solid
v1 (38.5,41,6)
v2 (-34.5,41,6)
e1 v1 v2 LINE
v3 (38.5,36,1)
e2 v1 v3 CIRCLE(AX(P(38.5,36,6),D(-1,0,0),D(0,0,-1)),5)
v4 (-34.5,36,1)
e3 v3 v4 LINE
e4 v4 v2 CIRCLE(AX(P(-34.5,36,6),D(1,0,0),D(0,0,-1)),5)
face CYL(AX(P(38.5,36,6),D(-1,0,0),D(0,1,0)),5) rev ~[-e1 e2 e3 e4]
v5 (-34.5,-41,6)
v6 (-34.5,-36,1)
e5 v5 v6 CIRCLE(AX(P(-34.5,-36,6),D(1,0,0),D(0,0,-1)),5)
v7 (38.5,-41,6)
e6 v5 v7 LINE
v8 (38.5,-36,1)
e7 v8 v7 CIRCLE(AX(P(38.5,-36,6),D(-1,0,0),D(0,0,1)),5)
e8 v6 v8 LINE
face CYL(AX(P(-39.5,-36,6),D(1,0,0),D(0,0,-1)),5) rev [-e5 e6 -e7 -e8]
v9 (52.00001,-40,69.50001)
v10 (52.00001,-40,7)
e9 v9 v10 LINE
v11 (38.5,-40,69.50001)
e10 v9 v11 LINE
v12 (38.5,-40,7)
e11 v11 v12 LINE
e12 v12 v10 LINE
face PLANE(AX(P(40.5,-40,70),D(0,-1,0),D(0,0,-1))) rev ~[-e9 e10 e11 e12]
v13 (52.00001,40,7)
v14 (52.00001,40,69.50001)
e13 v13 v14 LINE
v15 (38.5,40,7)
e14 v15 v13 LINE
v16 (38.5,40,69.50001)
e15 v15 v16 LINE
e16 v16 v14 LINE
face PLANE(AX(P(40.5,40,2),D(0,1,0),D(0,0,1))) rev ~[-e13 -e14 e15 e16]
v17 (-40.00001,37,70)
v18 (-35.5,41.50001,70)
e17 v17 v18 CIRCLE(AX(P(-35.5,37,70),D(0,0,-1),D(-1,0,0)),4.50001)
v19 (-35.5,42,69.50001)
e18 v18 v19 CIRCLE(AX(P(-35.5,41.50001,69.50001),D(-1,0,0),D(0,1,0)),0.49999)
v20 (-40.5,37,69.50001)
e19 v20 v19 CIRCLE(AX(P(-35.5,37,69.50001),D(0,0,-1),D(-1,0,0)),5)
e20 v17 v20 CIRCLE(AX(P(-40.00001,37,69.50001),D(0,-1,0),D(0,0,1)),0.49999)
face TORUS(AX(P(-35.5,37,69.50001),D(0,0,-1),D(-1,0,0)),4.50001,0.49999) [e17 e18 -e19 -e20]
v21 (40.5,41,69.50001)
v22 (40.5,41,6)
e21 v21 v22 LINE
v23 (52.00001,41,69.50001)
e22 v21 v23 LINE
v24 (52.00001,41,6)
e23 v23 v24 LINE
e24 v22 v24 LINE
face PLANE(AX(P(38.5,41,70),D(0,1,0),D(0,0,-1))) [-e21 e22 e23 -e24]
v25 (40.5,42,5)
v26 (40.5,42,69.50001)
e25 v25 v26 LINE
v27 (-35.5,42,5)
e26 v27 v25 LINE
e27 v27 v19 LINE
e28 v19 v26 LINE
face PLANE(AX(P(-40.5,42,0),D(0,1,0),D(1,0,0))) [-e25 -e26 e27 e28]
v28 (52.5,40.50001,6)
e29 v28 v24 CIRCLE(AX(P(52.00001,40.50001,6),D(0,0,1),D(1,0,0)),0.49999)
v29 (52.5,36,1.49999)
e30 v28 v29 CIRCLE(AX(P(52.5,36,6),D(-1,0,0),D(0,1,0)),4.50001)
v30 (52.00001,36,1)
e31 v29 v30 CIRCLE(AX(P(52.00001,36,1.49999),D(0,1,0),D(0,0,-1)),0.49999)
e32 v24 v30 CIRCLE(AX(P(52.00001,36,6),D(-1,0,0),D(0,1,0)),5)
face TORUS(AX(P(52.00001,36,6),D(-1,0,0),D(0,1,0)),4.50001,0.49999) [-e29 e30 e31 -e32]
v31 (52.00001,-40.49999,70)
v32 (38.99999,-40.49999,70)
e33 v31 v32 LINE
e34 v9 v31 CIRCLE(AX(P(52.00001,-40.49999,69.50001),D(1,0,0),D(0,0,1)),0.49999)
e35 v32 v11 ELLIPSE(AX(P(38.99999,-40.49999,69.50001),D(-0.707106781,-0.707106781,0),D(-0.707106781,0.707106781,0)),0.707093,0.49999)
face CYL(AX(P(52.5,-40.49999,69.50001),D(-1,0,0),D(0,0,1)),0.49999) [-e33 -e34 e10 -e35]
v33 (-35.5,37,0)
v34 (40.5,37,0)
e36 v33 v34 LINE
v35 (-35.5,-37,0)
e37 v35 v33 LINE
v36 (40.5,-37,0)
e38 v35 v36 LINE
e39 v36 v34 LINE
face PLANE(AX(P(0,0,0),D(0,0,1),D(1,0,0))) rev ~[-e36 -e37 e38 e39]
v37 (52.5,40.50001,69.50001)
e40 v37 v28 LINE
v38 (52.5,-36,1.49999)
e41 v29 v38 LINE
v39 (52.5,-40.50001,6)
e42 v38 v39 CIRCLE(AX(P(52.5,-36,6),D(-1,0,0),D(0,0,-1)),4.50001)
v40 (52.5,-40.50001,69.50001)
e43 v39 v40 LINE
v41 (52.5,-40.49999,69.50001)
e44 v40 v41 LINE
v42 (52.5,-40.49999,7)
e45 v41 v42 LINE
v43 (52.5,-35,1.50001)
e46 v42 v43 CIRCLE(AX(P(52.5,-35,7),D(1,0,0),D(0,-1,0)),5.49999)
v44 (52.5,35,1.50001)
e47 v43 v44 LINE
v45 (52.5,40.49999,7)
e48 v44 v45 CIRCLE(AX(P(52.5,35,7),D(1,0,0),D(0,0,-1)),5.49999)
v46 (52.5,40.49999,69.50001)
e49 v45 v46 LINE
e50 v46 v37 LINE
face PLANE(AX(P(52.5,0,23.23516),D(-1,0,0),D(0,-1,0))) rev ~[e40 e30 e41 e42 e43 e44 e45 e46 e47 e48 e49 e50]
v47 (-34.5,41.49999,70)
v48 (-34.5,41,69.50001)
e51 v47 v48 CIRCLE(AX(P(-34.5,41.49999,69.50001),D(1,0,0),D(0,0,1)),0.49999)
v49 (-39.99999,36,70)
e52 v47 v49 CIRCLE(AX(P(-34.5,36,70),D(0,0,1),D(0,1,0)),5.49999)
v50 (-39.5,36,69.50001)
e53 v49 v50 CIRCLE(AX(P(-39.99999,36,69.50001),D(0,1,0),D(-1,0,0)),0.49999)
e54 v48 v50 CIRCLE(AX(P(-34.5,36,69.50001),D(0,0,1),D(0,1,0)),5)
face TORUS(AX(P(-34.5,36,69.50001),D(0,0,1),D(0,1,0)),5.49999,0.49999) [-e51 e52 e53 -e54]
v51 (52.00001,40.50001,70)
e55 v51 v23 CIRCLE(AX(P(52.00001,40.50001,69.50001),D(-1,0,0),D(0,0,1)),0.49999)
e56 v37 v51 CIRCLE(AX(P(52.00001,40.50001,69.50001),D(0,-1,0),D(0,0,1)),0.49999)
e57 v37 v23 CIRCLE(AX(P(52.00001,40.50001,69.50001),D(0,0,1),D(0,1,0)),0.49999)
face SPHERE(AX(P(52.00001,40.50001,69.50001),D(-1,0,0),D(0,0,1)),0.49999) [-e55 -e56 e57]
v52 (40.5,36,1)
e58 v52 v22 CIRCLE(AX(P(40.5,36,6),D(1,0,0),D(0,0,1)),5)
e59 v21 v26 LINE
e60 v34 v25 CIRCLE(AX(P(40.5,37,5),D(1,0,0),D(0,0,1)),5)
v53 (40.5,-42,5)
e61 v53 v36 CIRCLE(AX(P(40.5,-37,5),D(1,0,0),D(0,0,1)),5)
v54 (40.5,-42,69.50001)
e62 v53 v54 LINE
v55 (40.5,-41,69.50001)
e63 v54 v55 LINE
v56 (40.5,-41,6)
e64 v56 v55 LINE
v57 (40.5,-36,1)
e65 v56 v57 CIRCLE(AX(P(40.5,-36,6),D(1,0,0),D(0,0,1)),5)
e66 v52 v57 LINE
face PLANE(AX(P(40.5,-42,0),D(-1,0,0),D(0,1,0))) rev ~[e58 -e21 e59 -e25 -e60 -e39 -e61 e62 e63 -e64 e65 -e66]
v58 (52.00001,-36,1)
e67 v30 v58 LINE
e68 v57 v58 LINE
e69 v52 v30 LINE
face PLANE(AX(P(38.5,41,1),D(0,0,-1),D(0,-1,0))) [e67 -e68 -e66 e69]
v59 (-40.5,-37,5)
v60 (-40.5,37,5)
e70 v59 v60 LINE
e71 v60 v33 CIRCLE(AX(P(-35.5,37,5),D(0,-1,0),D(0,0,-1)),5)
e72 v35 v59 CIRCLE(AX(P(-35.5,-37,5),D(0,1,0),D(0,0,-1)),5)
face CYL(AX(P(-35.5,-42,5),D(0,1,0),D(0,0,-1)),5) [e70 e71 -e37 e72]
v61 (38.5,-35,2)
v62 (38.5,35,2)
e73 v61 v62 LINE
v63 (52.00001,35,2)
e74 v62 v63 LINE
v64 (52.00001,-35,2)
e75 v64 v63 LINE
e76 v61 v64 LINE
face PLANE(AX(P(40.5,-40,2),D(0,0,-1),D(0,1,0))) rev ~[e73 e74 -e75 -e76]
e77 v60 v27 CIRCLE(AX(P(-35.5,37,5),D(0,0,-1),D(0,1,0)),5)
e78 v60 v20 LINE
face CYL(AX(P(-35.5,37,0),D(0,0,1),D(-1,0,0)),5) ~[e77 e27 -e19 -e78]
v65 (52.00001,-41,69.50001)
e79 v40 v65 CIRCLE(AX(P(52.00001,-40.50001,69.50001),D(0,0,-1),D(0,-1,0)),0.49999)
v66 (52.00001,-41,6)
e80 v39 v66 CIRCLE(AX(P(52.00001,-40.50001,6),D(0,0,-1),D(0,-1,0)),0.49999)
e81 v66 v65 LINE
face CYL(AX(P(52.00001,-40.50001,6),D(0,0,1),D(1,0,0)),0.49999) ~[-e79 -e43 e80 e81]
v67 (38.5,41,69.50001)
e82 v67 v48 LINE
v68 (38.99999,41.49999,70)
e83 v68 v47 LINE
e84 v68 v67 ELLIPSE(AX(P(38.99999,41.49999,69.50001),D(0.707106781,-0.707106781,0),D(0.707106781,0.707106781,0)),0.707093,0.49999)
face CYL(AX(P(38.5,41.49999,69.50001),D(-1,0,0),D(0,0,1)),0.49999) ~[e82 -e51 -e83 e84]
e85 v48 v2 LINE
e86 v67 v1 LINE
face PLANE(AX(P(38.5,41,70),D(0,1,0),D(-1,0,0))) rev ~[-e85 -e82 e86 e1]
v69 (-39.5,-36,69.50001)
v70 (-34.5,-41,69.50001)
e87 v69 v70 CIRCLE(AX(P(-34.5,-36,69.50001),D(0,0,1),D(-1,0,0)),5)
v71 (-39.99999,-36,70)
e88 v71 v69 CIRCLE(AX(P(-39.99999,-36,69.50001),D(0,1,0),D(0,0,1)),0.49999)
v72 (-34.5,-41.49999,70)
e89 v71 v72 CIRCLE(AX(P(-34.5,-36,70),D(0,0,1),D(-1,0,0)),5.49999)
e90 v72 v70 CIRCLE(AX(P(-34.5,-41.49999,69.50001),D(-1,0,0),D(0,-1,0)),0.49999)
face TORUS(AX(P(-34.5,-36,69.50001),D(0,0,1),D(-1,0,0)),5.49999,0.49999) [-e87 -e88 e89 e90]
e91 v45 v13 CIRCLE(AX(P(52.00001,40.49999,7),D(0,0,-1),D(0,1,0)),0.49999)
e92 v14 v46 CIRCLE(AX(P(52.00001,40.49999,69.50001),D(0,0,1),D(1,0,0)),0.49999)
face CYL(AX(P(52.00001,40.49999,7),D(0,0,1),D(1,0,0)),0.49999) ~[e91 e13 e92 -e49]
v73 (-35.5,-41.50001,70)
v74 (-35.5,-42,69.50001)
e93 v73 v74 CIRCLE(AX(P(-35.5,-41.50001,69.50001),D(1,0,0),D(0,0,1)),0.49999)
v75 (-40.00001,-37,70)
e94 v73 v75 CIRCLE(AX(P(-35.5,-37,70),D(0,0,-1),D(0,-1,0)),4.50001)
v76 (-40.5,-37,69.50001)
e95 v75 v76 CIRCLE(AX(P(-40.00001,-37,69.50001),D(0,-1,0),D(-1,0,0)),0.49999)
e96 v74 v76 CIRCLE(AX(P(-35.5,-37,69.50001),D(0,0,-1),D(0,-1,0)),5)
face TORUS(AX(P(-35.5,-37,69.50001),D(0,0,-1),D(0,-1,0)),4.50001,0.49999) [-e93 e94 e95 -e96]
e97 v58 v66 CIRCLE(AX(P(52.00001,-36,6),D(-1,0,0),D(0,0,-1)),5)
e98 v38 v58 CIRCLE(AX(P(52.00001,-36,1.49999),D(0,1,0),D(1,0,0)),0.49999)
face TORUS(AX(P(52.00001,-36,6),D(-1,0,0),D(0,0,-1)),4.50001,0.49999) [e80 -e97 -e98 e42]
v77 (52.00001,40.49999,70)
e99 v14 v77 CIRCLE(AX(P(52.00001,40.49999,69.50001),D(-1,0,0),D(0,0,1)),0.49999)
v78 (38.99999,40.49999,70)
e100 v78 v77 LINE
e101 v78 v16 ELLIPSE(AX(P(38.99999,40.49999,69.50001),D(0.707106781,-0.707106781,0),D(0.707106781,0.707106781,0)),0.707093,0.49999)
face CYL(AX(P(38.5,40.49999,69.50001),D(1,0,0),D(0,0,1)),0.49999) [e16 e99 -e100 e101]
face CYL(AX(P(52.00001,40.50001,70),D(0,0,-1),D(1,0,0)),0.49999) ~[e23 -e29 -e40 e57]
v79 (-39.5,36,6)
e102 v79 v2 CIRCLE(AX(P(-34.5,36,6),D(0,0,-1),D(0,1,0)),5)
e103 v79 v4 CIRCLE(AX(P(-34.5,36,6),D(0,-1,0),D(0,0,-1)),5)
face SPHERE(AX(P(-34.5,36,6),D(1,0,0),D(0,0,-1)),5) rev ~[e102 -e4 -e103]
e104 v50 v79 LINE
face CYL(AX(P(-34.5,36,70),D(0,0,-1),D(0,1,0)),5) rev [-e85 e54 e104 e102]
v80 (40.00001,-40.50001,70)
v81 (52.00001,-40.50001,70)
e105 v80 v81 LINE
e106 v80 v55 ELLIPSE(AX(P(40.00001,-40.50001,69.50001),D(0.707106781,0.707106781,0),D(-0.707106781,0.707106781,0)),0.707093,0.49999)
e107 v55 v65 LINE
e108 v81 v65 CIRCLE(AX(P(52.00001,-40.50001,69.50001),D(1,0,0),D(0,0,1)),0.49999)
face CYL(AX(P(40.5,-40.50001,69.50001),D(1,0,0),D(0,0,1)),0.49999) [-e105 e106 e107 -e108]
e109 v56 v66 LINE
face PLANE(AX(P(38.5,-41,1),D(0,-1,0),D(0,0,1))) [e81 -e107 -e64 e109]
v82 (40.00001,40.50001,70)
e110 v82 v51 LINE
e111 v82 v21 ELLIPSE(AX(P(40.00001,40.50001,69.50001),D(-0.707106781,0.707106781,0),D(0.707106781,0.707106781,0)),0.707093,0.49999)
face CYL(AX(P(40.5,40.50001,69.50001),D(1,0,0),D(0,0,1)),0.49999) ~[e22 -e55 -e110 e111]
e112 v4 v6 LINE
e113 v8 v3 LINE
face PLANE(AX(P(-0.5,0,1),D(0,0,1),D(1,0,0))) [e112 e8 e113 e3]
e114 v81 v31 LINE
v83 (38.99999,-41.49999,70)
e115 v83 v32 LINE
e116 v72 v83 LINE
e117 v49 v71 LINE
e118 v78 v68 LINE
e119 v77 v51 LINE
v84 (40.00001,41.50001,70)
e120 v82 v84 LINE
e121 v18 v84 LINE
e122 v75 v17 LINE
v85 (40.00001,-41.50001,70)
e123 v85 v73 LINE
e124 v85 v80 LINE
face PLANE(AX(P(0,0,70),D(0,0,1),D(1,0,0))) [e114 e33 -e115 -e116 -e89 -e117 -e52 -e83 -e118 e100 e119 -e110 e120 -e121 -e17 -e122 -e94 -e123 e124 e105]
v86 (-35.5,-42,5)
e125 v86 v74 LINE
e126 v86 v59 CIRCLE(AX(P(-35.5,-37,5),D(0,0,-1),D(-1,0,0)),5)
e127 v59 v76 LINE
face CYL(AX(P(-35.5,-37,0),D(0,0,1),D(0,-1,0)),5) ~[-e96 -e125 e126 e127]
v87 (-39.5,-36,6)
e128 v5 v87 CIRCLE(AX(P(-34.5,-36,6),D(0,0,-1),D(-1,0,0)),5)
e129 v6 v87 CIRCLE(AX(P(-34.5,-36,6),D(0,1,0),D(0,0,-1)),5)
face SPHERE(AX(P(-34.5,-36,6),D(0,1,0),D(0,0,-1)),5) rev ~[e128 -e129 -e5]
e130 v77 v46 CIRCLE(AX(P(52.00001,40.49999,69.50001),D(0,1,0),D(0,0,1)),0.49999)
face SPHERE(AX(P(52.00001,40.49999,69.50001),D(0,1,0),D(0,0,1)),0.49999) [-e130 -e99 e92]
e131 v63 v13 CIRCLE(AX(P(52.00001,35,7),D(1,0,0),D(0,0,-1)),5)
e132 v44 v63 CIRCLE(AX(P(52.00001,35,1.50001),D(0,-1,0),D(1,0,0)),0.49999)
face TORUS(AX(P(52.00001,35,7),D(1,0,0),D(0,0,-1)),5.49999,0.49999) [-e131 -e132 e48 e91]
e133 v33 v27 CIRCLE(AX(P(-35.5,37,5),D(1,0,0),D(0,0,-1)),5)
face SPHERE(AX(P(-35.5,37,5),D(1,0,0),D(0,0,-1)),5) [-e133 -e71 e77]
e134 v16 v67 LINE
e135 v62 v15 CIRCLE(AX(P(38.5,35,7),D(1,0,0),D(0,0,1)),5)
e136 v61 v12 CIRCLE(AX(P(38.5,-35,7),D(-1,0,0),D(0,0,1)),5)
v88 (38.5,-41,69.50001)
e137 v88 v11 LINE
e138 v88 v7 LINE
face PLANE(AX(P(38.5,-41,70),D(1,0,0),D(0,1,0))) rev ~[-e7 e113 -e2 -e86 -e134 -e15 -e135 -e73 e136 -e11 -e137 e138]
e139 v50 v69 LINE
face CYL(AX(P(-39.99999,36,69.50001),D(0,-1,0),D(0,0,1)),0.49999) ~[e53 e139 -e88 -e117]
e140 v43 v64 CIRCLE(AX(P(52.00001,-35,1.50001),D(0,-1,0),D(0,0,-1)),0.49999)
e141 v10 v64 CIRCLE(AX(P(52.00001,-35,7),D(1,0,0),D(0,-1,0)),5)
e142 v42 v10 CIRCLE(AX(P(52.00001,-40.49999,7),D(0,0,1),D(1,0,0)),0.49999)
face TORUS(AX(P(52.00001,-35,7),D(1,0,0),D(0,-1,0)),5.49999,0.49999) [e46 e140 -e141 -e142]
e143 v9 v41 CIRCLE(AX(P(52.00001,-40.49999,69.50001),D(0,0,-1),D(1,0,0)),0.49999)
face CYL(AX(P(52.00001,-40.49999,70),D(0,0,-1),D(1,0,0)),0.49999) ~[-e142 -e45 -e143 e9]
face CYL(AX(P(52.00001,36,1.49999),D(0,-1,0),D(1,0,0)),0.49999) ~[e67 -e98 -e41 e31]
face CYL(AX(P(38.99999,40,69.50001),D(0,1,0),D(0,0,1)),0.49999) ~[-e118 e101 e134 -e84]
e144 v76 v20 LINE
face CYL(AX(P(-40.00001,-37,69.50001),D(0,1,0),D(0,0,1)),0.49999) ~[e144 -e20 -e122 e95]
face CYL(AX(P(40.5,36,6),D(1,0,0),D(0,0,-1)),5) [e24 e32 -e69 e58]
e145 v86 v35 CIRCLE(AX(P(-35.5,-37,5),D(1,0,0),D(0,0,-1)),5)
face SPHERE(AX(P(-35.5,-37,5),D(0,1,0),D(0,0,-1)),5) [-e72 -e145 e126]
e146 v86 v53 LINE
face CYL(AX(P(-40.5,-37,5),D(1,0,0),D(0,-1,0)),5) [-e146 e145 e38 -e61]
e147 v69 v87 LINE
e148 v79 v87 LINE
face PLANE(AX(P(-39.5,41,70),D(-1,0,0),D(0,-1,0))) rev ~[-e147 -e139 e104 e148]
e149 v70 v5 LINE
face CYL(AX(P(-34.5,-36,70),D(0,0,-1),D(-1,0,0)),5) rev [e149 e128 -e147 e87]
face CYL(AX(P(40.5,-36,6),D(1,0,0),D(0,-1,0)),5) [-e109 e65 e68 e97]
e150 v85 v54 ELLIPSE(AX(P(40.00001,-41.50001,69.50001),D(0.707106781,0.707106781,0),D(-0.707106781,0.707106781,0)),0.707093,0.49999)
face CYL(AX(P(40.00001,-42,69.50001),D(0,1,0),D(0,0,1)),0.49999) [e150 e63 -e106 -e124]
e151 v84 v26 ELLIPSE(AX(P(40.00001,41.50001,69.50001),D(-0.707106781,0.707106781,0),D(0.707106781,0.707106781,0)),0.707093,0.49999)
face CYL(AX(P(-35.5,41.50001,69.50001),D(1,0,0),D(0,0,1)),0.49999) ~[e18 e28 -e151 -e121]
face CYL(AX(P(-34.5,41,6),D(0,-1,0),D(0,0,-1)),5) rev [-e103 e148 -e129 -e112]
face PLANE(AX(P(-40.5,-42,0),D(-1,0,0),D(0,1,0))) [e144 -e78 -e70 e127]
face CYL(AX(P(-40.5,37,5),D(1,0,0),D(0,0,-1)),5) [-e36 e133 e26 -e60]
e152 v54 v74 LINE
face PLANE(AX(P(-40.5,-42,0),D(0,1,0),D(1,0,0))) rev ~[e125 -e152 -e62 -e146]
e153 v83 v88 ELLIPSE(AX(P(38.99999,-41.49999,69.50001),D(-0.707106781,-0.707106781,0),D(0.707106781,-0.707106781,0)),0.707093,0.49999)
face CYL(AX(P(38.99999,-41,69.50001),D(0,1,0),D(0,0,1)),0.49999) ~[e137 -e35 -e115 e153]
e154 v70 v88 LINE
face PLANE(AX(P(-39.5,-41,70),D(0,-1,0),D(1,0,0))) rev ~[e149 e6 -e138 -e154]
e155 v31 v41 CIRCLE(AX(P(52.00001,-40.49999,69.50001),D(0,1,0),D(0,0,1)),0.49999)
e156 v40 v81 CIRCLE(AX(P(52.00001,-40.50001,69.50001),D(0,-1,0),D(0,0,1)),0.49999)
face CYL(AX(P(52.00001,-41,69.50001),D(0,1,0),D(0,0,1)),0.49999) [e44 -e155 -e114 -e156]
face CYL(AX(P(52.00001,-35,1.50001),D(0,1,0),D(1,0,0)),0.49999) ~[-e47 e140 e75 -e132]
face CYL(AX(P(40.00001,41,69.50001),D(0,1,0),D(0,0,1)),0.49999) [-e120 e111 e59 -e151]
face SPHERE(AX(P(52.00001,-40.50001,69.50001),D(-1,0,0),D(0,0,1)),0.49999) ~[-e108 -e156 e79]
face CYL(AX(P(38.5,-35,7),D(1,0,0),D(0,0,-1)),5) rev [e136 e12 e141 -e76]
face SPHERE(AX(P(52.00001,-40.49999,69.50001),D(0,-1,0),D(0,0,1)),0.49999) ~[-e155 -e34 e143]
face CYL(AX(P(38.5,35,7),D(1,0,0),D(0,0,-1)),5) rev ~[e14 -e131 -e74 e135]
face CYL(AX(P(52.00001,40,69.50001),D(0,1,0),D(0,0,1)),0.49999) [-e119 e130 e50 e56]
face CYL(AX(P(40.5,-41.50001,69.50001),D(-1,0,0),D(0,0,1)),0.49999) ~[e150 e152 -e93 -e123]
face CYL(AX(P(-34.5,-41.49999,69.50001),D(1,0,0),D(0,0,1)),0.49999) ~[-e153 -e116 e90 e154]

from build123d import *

# Parameters (mm, degrees)
F0_W     = 81
F0_H     = 84
F1_DEPTH = 70
F3_DEPTH = 69
F5_DEPTH = 2
F7_DEPTH = 14
F8_R     = 5
F9_R     = 0.49999


# Not quite as in the source:
# - a fillet or chamfer is up to 0.001 mm smaller than in the source, because OpenCascade refuses the exact size


with BuildPart() as f1:
    # F0 (on Top) → F1 (new body)
    with BuildSketch(Plane.XY):
        Rectangle(F0_W, F0_H)
    extrude(amount=F1_DEPTH)

    # F2 (on face) → F3 (cut)
    with BuildSketch(Plane.XY.offset(70)):
        Polygon((38.5, 41), (-39.5, 41), (-39.5, 20.586034283), (-39.5, -41), (38.5, -41), (38.5, -37.5405208561), align=None)
    extrude(amount=-F3_DEPTH, mode=Mode.SUBTRACT)

    # F4 (on face) → F5 (cut)
    with BuildSketch(Plane.YZ.offset(40.5)):
        Polygon((40, 2), (40, 70), (-40, 70), (-40, 42.2970801592), (-40, 2), align=None)
    extrude(amount=-F5_DEPTH, mode=Mode.SUBTRACT)

    # F6 (on face) → F7 (join)
    with BuildSketch(Plane(origin=(38.5, 0, 0), x_dir=(0, -1, 0), z_dir=(-1, 0, 0))):
        Polygon((41, 1), (41, 70), (40, 70), (40, 2), (-40, 2), (-40, 70), (-41, 70), (-41, 1), align=None)
    extrude(amount=-F7_DEPTH)

    # F8
    f8_edges = [f1.edges().sort_by_distance(p)[0] for p in [
        (-0.5, 41, 1),
        (-39.5, 0, 1),
        (-0.5, -41, 1),
        (0, 42, 0),
        (-40.5, 0, 0),
        (0, -42, 0),
        (-40.5, -42, 35),
        (-40.5, 42, 35),
        (-39.5, 41, 35.5),
        (-39.5, -41, 35.5),
        (46.5, 41, 1),
        (46.5, -41, 1),
        (45.5, -40, 2),
        (45.5, 40, 2),
    ]]
    fillet(f8_edges, radius=F8_R)

    # F9 (radius 0.5 in the source; OpenCascade refuses exactly that, so slightly less here)
    f9_edges = [f1.edges().sort_by_distance(p)[0] for p in [
        (2.5, 42, 70),
        (-39.035534, 40.535534, 70),
        (40.5, 41.5, 70),
        (-40.5, 0, 70),
        (46.5, 41, 70),
        (-39.035534, -40.535534, 70),
        (52.5, 40.5, 70),
        (2.5, -42, 70),
        (45.5, 40, 70),
        (40.5, -41.5, 70),
        (38.5, 40.5, 70),
        (46.5, -41, 70),
        (2, 41, 70),
        (52.5, -40.5, 70),
        (-38.035534, 39.535534, 70),
        (45.5, -40, 70),
        (-39.5, 0, 70),
        (38.5, -40.5, 70),
        (-38.035534, -39.535534, 70),
        (2, -41, 70),
        (52.5, -41, 38),
        (52.5, -39.535534, 2.464466),
        (52.5, 0, 1),
        (52.5, -40, 38.5),
        (52.5, 39.535534, 2.464466),
        (52.5, -38.535534, 3.464466),
        (52.5, 41, 38),
        (52.5, 0, 2),
        (52.5, 38.535534, 3.464466),
        (52.5, 40, 38.5),
    ]]
    fillet(f9_edges, radius=F9_R)


solid = f1.part
